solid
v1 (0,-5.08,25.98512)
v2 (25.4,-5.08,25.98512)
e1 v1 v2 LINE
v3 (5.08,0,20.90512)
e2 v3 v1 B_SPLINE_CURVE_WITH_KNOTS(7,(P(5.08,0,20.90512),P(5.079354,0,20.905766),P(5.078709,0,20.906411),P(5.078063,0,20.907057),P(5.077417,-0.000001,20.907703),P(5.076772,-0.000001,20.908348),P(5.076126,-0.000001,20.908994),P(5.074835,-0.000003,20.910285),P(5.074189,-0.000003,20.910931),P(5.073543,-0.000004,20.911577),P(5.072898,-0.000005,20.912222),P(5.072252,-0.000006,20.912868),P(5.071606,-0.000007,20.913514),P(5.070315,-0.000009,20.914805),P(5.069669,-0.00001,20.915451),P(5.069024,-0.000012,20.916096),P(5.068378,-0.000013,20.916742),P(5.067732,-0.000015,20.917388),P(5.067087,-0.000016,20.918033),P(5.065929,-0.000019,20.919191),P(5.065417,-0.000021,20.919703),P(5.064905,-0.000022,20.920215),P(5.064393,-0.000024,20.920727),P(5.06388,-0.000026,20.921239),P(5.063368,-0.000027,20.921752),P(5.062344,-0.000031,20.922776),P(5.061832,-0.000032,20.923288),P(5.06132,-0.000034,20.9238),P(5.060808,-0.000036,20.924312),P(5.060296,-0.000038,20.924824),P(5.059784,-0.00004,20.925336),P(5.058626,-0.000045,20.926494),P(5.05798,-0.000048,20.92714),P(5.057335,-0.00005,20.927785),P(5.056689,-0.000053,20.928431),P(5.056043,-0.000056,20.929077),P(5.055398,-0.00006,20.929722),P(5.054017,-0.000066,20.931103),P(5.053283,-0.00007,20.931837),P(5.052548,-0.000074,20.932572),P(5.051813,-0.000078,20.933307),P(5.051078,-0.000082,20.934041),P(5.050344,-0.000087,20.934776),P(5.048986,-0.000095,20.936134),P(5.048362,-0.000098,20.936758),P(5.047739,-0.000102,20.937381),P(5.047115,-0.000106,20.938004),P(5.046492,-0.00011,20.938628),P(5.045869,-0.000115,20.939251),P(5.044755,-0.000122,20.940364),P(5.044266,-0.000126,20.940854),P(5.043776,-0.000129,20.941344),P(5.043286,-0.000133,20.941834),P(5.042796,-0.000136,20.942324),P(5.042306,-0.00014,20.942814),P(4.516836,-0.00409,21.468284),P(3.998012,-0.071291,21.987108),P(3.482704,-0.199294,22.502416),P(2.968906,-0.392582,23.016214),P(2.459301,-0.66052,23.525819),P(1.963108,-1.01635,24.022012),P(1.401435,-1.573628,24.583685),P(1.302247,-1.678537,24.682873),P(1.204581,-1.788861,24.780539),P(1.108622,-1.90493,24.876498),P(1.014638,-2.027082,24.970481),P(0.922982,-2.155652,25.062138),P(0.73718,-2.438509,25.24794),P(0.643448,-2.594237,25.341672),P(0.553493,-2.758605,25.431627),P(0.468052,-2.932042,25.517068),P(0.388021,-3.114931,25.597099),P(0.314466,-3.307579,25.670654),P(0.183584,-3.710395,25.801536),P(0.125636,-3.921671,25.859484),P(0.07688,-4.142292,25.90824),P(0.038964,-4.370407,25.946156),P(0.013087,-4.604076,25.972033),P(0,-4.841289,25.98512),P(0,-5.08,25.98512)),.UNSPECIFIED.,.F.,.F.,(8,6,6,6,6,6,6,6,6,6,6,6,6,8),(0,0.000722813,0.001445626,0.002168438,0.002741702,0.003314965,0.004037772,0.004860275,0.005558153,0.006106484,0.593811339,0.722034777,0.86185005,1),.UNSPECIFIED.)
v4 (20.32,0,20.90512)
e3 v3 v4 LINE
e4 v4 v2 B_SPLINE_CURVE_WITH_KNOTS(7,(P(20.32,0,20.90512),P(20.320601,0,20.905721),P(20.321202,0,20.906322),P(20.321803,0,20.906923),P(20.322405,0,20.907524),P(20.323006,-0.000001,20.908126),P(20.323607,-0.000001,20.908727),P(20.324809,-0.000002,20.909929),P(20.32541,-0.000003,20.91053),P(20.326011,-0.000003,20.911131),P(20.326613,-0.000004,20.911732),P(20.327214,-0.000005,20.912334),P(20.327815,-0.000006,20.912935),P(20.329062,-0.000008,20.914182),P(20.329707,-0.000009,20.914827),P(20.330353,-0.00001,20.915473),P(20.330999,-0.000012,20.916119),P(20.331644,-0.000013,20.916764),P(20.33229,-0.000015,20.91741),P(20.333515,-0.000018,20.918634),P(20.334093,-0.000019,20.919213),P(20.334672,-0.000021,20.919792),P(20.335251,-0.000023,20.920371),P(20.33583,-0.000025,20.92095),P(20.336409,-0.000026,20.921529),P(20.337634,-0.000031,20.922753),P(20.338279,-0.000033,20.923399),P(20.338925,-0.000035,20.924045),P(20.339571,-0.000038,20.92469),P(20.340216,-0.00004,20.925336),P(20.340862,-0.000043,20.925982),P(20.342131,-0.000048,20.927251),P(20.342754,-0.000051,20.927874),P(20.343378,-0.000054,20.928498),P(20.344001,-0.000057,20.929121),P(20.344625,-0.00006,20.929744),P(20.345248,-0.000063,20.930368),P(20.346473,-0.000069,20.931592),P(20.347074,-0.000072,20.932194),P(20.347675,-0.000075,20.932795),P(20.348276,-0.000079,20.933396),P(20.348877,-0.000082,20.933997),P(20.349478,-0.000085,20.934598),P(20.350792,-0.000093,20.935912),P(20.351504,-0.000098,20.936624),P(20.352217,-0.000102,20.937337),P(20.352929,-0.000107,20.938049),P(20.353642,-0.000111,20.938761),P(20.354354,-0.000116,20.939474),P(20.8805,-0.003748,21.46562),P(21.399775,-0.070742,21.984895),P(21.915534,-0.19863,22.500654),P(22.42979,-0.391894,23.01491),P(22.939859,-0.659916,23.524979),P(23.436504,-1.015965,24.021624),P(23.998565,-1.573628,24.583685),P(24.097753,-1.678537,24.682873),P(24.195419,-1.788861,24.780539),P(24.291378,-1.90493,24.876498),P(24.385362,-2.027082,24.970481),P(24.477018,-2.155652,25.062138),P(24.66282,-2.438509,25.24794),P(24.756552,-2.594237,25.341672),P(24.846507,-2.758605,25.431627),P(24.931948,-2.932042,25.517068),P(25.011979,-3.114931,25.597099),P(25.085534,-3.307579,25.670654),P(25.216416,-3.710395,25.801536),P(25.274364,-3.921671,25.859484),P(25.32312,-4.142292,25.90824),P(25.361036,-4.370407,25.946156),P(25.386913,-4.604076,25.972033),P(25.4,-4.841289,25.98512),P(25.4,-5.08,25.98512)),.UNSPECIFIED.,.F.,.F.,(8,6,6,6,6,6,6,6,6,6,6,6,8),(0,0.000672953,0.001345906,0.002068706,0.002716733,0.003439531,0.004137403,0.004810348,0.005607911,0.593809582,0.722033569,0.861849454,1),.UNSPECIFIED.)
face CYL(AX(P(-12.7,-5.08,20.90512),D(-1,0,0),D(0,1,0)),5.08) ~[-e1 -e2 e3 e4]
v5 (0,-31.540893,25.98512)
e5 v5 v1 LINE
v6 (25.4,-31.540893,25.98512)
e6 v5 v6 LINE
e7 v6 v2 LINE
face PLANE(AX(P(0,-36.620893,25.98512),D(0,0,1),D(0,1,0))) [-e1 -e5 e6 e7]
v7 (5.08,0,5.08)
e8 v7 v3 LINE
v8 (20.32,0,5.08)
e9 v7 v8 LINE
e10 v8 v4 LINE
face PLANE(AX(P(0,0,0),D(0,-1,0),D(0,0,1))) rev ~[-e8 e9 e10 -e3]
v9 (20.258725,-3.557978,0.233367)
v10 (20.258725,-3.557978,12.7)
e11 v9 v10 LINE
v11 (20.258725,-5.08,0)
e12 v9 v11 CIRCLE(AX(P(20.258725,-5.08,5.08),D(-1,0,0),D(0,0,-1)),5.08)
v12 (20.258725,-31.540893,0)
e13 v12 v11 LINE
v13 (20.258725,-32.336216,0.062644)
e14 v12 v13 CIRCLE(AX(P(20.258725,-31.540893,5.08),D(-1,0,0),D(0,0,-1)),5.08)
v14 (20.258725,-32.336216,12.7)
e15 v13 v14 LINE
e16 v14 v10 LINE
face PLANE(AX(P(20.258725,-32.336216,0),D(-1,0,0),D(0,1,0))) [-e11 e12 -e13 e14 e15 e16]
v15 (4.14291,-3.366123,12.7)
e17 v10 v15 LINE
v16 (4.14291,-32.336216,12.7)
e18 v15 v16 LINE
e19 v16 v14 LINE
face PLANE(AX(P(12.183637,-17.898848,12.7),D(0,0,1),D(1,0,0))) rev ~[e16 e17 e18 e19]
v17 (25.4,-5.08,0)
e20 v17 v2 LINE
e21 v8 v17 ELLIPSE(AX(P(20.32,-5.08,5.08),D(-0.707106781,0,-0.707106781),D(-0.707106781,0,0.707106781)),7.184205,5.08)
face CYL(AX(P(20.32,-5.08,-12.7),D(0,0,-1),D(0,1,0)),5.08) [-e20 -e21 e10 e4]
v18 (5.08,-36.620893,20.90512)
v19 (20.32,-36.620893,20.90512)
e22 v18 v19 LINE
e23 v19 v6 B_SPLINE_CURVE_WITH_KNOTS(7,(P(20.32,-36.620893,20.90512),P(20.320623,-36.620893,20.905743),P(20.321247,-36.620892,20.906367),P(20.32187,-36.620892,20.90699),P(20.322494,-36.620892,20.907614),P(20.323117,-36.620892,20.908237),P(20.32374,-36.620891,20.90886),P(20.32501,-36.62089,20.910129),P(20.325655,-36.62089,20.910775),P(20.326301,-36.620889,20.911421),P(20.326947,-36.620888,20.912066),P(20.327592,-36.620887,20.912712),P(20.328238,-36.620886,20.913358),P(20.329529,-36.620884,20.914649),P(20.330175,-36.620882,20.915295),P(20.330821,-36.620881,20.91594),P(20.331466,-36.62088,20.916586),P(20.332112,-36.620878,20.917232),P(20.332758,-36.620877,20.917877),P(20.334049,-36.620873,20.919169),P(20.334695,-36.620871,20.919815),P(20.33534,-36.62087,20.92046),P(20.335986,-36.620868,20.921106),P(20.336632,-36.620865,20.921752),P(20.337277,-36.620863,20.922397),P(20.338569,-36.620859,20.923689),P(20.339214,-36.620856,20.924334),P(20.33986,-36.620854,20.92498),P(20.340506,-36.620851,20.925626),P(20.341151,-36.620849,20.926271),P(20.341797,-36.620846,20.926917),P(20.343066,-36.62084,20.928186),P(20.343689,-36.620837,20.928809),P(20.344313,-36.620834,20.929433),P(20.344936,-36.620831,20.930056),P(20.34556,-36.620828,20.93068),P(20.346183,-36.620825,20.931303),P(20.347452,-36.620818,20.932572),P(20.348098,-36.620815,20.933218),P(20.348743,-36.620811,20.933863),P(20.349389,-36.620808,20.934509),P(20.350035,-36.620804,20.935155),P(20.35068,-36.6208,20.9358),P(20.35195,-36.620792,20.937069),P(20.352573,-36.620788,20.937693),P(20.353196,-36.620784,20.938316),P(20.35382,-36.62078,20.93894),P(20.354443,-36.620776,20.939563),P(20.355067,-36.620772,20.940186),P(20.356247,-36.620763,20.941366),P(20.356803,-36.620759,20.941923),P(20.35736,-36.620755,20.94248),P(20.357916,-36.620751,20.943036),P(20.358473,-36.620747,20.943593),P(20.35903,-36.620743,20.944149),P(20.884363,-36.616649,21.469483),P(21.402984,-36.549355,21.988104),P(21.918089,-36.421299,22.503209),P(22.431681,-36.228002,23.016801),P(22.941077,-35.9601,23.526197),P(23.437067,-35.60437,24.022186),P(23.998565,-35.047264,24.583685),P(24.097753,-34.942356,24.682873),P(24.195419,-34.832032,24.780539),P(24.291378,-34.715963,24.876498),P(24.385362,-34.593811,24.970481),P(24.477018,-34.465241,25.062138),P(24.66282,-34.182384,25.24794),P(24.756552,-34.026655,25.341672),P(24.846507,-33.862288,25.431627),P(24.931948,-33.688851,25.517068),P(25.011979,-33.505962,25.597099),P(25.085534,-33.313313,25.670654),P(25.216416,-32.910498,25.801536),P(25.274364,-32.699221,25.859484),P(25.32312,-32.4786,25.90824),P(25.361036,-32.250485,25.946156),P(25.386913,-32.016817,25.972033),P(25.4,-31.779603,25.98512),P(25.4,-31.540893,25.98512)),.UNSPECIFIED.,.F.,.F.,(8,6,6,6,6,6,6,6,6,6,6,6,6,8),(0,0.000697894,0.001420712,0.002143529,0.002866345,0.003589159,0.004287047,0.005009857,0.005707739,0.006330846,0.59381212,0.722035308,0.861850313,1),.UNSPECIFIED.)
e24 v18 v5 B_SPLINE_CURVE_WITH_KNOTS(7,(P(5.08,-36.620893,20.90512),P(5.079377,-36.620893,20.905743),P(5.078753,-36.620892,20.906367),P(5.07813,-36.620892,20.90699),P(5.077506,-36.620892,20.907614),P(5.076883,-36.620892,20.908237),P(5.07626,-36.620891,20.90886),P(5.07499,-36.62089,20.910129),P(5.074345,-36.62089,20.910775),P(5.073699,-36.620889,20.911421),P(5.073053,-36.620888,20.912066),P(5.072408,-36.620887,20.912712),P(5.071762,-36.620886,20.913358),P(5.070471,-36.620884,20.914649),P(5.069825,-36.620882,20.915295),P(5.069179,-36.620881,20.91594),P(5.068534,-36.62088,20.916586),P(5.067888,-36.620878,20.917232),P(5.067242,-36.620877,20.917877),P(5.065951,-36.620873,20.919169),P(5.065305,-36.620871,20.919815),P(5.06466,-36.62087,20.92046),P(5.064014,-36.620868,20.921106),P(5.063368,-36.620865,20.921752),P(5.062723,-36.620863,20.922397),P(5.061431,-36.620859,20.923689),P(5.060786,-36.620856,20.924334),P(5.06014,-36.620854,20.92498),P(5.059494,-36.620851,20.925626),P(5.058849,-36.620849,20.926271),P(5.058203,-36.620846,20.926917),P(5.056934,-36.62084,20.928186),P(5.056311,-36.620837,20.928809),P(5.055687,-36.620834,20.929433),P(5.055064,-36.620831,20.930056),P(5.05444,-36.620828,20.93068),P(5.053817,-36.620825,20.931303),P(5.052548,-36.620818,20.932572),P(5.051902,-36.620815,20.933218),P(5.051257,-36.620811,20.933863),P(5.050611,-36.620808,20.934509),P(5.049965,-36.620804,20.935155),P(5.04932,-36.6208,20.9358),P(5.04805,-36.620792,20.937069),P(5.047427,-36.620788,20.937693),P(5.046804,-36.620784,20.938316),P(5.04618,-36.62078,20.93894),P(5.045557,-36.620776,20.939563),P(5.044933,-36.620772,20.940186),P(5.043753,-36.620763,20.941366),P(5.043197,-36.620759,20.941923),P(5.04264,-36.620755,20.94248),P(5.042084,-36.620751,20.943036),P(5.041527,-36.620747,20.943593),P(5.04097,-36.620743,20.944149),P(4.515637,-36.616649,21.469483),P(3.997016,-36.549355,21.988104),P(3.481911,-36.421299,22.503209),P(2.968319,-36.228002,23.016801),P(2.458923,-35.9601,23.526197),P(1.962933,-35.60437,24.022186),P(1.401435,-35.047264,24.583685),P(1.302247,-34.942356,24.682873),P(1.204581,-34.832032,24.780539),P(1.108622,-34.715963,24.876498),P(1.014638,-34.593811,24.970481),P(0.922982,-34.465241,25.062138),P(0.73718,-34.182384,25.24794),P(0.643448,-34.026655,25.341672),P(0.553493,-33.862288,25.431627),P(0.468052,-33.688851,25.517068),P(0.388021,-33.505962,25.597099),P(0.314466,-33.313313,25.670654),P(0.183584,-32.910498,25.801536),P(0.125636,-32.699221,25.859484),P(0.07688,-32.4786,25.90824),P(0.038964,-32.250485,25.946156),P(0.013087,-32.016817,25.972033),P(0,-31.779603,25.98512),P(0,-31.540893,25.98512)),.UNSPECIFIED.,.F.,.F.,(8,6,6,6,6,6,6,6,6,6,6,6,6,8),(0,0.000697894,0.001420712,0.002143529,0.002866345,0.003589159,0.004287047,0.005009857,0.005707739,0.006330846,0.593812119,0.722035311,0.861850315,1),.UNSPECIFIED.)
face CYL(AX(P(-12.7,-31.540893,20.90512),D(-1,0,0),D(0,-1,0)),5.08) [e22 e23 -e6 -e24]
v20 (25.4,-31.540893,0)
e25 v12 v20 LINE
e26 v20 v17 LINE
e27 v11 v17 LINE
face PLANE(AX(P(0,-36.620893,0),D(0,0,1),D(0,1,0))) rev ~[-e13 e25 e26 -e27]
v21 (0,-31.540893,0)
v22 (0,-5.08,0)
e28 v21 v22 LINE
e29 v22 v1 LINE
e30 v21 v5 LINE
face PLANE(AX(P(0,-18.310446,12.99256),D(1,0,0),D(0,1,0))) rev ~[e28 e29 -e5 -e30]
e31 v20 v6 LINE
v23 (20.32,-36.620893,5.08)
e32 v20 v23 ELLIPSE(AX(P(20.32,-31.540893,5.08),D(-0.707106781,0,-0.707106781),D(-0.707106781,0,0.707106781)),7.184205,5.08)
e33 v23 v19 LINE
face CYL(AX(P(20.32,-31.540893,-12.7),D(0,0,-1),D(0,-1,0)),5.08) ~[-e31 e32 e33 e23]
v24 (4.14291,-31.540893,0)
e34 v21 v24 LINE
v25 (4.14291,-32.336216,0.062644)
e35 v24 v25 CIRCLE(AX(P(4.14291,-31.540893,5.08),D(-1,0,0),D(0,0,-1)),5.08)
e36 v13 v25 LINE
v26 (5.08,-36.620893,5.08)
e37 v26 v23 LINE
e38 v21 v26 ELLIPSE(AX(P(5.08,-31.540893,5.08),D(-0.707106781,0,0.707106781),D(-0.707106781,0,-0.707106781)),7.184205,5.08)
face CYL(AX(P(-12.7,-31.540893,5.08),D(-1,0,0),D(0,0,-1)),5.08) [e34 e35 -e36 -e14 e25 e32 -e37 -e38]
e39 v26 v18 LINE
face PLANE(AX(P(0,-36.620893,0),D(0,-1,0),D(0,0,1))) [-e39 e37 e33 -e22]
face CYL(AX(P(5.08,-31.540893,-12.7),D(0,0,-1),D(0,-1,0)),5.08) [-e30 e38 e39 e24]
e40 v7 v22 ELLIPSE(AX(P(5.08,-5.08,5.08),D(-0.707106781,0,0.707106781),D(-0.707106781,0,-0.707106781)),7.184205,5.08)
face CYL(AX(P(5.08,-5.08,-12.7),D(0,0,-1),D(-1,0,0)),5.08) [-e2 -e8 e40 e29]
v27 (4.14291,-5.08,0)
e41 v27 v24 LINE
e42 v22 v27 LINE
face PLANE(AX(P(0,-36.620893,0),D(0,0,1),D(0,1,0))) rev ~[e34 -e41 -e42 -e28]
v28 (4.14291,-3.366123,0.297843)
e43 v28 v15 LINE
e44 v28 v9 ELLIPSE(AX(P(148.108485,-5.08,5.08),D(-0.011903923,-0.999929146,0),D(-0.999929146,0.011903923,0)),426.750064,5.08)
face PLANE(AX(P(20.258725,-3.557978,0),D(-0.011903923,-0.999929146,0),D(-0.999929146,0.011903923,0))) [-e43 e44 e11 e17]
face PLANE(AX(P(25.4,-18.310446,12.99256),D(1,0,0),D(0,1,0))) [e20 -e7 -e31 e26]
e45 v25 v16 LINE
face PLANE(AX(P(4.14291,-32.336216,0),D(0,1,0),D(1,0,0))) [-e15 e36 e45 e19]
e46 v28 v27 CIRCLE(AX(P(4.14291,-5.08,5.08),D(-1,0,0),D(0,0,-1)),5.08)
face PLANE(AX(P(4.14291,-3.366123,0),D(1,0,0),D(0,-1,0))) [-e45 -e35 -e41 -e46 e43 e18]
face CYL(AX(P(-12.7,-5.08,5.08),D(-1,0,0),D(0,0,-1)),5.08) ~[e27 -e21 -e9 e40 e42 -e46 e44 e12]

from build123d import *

# Parameters (mm, degrees)
F0_W        = 36.6208925843
F0_H        = 25.9851198643
F1_DEPTH    = 25.4
F3_DEPTH    = 12.7
F4_DEPTH    = 12.7
F5_T1_DEPTH = 50.8
F5_T3_DEPTH = 51.3851198643
F6_T1_DEPTH = 50.8
F6_T3_DEPTH = 51.3851198643


# Not quite as in the source:
# - a fillet or chamfer that OpenCascade refuses, or shapes differently, is made with other operations: its cross-section is extruded or revolved along the edge and cut away or added


with BuildPart() as f1:
    # F0 (on Right) → F1 (new body)
    with BuildSketch(Plane.YZ):
        with Locations((-18.3104462922, 12.9925599322)):
            Rectangle(F0_W, F0_H)
    extrude(amount=F1_DEPTH)

    # F2 (on Top) → F3 (join)
    with BuildSketch(Plane.XY):
        Polygon((20.2587246895, -3.5579784308), (4.1429102421, -3.3661234193), (4.1429102421, -32.3362164199), (20.2587246895, -32.3362164199), align=None)
    extrude(amount=F3_DEPTH)

    # F2 (on Top) → F4 (cut)
    with BuildSketch(Plane.XY):
        Polygon((20.2587246895, -3.5579784308), (4.1429102421, -3.3661234193), (4.1429102421, -32.3362164199), (20.2587246895, -32.3362164199), align=None)
    extrude(amount=F4_DEPTH, mode=Mode.SUBTRACT)

    # F5: fillet of radius 5.08 on 4 edges, made by hand

    # F5_s2 → F5_t1 (cut)
    with BuildSketch(Plane.YZ.offset(-12.7)):
        with BuildLine():
            ThreePointArc((-36.6208925843, 20.9051198643), (-35.1329950328, 24.4972223128), (-31.5408925843, 25.9851198643))
            Line((-31.5408925843, 25.9851198643), (-36.6208925843, 25.9851198643))
            Line((-36.6208925843, 25.9851198643), (-36.6208925843, 20.9051198643))
        make_face()
        with BuildLine():
            ThreePointArc((-31.5408925843, 0), (-35.1329950328, 1.4878975516), (-36.6208925843, 5.08))
            Line((-36.6208925843, 5.08), (-36.6208925843, 0))
            Line((-36.6208925843, 0), (-31.5408925843, 0))
        make_face()
    extrude(amount=F5_T1_DEPTH, mode=Mode.SUBTRACT)

    # F5_s4 → F5_t3 (cut)
    with BuildSketch(Plane.XY.offset(-12.7)):
        with BuildLine():
            ThreePointArc((5.08, -36.6208925843), (1.4878975516, -35.1329950328), (0, -31.5408925843))
            Line((0, -31.5408925843), (0, -36.6208925843))
            Line((0, -36.6208925843), (5.08, -36.6208925843))
        make_face()
        with BuildLine():
            ThreePointArc((20.32, -36.6208925843), (23.9121024484, -35.1329950328), (25.4, -31.5408925843))
            Line((25.4, -31.5408925843), (25.4, -36.6208925843))
            Line((25.4, -36.6208925843), (20.32, -36.6208925843))
        make_face()
    extrude(amount=F5_T3_DEPTH, mode=Mode.SUBTRACT)

    # F6: fillet of radius 5.08 on 4 edges, made by hand

    # F6_s2 → F6_t1 (cut)
    with BuildSketch(Plane.YZ.offset(-12.7)):
        with BuildLine():
            ThreePointArc((-5.08, 0), (-1.4878975516, 1.4878975516), (0, 5.08))
            Line((0, 5.08), (0, 0))
            Line((0, 0), (-5.08, 0))
        make_face()
        with BuildLine():
            ThreePointArc((0, 20.9051198643), (-1.4878975516, 24.4972223128), (-5.08, 25.9851198643))
            Line((-5.08, 25.9851198643), (0, 25.9851198643))
            Line((0, 25.9851198643), (0, 20.9051198643))
        make_face()
    extrude(amount=F6_T1_DEPTH, mode=Mode.SUBTRACT)

    # F6_s4 → F6_t3 (cut)
    with BuildSketch(Plane.XY.offset(-12.7)):
        with BuildLine():
            ThreePointArc((0, -5.08), (1.4878975516, -1.4878975516), (5.08, 0))
            Line((5.08, 0), (0, 0))
            Line((0, 0), (0, -5.08))
        make_face()
        with BuildLine():
            ThreePointArc((20.32, 0), (23.9121024484, -1.4878975516), (25.4, -5.08))
            Line((25.4, -5.08), (25.4, 0))
            Line((25.4, 0), (20.32, 0))
        make_face()
    extrude(amount=F6_T3_DEPTH, mode=Mode.SUBTRACT)


solid = f1.part
